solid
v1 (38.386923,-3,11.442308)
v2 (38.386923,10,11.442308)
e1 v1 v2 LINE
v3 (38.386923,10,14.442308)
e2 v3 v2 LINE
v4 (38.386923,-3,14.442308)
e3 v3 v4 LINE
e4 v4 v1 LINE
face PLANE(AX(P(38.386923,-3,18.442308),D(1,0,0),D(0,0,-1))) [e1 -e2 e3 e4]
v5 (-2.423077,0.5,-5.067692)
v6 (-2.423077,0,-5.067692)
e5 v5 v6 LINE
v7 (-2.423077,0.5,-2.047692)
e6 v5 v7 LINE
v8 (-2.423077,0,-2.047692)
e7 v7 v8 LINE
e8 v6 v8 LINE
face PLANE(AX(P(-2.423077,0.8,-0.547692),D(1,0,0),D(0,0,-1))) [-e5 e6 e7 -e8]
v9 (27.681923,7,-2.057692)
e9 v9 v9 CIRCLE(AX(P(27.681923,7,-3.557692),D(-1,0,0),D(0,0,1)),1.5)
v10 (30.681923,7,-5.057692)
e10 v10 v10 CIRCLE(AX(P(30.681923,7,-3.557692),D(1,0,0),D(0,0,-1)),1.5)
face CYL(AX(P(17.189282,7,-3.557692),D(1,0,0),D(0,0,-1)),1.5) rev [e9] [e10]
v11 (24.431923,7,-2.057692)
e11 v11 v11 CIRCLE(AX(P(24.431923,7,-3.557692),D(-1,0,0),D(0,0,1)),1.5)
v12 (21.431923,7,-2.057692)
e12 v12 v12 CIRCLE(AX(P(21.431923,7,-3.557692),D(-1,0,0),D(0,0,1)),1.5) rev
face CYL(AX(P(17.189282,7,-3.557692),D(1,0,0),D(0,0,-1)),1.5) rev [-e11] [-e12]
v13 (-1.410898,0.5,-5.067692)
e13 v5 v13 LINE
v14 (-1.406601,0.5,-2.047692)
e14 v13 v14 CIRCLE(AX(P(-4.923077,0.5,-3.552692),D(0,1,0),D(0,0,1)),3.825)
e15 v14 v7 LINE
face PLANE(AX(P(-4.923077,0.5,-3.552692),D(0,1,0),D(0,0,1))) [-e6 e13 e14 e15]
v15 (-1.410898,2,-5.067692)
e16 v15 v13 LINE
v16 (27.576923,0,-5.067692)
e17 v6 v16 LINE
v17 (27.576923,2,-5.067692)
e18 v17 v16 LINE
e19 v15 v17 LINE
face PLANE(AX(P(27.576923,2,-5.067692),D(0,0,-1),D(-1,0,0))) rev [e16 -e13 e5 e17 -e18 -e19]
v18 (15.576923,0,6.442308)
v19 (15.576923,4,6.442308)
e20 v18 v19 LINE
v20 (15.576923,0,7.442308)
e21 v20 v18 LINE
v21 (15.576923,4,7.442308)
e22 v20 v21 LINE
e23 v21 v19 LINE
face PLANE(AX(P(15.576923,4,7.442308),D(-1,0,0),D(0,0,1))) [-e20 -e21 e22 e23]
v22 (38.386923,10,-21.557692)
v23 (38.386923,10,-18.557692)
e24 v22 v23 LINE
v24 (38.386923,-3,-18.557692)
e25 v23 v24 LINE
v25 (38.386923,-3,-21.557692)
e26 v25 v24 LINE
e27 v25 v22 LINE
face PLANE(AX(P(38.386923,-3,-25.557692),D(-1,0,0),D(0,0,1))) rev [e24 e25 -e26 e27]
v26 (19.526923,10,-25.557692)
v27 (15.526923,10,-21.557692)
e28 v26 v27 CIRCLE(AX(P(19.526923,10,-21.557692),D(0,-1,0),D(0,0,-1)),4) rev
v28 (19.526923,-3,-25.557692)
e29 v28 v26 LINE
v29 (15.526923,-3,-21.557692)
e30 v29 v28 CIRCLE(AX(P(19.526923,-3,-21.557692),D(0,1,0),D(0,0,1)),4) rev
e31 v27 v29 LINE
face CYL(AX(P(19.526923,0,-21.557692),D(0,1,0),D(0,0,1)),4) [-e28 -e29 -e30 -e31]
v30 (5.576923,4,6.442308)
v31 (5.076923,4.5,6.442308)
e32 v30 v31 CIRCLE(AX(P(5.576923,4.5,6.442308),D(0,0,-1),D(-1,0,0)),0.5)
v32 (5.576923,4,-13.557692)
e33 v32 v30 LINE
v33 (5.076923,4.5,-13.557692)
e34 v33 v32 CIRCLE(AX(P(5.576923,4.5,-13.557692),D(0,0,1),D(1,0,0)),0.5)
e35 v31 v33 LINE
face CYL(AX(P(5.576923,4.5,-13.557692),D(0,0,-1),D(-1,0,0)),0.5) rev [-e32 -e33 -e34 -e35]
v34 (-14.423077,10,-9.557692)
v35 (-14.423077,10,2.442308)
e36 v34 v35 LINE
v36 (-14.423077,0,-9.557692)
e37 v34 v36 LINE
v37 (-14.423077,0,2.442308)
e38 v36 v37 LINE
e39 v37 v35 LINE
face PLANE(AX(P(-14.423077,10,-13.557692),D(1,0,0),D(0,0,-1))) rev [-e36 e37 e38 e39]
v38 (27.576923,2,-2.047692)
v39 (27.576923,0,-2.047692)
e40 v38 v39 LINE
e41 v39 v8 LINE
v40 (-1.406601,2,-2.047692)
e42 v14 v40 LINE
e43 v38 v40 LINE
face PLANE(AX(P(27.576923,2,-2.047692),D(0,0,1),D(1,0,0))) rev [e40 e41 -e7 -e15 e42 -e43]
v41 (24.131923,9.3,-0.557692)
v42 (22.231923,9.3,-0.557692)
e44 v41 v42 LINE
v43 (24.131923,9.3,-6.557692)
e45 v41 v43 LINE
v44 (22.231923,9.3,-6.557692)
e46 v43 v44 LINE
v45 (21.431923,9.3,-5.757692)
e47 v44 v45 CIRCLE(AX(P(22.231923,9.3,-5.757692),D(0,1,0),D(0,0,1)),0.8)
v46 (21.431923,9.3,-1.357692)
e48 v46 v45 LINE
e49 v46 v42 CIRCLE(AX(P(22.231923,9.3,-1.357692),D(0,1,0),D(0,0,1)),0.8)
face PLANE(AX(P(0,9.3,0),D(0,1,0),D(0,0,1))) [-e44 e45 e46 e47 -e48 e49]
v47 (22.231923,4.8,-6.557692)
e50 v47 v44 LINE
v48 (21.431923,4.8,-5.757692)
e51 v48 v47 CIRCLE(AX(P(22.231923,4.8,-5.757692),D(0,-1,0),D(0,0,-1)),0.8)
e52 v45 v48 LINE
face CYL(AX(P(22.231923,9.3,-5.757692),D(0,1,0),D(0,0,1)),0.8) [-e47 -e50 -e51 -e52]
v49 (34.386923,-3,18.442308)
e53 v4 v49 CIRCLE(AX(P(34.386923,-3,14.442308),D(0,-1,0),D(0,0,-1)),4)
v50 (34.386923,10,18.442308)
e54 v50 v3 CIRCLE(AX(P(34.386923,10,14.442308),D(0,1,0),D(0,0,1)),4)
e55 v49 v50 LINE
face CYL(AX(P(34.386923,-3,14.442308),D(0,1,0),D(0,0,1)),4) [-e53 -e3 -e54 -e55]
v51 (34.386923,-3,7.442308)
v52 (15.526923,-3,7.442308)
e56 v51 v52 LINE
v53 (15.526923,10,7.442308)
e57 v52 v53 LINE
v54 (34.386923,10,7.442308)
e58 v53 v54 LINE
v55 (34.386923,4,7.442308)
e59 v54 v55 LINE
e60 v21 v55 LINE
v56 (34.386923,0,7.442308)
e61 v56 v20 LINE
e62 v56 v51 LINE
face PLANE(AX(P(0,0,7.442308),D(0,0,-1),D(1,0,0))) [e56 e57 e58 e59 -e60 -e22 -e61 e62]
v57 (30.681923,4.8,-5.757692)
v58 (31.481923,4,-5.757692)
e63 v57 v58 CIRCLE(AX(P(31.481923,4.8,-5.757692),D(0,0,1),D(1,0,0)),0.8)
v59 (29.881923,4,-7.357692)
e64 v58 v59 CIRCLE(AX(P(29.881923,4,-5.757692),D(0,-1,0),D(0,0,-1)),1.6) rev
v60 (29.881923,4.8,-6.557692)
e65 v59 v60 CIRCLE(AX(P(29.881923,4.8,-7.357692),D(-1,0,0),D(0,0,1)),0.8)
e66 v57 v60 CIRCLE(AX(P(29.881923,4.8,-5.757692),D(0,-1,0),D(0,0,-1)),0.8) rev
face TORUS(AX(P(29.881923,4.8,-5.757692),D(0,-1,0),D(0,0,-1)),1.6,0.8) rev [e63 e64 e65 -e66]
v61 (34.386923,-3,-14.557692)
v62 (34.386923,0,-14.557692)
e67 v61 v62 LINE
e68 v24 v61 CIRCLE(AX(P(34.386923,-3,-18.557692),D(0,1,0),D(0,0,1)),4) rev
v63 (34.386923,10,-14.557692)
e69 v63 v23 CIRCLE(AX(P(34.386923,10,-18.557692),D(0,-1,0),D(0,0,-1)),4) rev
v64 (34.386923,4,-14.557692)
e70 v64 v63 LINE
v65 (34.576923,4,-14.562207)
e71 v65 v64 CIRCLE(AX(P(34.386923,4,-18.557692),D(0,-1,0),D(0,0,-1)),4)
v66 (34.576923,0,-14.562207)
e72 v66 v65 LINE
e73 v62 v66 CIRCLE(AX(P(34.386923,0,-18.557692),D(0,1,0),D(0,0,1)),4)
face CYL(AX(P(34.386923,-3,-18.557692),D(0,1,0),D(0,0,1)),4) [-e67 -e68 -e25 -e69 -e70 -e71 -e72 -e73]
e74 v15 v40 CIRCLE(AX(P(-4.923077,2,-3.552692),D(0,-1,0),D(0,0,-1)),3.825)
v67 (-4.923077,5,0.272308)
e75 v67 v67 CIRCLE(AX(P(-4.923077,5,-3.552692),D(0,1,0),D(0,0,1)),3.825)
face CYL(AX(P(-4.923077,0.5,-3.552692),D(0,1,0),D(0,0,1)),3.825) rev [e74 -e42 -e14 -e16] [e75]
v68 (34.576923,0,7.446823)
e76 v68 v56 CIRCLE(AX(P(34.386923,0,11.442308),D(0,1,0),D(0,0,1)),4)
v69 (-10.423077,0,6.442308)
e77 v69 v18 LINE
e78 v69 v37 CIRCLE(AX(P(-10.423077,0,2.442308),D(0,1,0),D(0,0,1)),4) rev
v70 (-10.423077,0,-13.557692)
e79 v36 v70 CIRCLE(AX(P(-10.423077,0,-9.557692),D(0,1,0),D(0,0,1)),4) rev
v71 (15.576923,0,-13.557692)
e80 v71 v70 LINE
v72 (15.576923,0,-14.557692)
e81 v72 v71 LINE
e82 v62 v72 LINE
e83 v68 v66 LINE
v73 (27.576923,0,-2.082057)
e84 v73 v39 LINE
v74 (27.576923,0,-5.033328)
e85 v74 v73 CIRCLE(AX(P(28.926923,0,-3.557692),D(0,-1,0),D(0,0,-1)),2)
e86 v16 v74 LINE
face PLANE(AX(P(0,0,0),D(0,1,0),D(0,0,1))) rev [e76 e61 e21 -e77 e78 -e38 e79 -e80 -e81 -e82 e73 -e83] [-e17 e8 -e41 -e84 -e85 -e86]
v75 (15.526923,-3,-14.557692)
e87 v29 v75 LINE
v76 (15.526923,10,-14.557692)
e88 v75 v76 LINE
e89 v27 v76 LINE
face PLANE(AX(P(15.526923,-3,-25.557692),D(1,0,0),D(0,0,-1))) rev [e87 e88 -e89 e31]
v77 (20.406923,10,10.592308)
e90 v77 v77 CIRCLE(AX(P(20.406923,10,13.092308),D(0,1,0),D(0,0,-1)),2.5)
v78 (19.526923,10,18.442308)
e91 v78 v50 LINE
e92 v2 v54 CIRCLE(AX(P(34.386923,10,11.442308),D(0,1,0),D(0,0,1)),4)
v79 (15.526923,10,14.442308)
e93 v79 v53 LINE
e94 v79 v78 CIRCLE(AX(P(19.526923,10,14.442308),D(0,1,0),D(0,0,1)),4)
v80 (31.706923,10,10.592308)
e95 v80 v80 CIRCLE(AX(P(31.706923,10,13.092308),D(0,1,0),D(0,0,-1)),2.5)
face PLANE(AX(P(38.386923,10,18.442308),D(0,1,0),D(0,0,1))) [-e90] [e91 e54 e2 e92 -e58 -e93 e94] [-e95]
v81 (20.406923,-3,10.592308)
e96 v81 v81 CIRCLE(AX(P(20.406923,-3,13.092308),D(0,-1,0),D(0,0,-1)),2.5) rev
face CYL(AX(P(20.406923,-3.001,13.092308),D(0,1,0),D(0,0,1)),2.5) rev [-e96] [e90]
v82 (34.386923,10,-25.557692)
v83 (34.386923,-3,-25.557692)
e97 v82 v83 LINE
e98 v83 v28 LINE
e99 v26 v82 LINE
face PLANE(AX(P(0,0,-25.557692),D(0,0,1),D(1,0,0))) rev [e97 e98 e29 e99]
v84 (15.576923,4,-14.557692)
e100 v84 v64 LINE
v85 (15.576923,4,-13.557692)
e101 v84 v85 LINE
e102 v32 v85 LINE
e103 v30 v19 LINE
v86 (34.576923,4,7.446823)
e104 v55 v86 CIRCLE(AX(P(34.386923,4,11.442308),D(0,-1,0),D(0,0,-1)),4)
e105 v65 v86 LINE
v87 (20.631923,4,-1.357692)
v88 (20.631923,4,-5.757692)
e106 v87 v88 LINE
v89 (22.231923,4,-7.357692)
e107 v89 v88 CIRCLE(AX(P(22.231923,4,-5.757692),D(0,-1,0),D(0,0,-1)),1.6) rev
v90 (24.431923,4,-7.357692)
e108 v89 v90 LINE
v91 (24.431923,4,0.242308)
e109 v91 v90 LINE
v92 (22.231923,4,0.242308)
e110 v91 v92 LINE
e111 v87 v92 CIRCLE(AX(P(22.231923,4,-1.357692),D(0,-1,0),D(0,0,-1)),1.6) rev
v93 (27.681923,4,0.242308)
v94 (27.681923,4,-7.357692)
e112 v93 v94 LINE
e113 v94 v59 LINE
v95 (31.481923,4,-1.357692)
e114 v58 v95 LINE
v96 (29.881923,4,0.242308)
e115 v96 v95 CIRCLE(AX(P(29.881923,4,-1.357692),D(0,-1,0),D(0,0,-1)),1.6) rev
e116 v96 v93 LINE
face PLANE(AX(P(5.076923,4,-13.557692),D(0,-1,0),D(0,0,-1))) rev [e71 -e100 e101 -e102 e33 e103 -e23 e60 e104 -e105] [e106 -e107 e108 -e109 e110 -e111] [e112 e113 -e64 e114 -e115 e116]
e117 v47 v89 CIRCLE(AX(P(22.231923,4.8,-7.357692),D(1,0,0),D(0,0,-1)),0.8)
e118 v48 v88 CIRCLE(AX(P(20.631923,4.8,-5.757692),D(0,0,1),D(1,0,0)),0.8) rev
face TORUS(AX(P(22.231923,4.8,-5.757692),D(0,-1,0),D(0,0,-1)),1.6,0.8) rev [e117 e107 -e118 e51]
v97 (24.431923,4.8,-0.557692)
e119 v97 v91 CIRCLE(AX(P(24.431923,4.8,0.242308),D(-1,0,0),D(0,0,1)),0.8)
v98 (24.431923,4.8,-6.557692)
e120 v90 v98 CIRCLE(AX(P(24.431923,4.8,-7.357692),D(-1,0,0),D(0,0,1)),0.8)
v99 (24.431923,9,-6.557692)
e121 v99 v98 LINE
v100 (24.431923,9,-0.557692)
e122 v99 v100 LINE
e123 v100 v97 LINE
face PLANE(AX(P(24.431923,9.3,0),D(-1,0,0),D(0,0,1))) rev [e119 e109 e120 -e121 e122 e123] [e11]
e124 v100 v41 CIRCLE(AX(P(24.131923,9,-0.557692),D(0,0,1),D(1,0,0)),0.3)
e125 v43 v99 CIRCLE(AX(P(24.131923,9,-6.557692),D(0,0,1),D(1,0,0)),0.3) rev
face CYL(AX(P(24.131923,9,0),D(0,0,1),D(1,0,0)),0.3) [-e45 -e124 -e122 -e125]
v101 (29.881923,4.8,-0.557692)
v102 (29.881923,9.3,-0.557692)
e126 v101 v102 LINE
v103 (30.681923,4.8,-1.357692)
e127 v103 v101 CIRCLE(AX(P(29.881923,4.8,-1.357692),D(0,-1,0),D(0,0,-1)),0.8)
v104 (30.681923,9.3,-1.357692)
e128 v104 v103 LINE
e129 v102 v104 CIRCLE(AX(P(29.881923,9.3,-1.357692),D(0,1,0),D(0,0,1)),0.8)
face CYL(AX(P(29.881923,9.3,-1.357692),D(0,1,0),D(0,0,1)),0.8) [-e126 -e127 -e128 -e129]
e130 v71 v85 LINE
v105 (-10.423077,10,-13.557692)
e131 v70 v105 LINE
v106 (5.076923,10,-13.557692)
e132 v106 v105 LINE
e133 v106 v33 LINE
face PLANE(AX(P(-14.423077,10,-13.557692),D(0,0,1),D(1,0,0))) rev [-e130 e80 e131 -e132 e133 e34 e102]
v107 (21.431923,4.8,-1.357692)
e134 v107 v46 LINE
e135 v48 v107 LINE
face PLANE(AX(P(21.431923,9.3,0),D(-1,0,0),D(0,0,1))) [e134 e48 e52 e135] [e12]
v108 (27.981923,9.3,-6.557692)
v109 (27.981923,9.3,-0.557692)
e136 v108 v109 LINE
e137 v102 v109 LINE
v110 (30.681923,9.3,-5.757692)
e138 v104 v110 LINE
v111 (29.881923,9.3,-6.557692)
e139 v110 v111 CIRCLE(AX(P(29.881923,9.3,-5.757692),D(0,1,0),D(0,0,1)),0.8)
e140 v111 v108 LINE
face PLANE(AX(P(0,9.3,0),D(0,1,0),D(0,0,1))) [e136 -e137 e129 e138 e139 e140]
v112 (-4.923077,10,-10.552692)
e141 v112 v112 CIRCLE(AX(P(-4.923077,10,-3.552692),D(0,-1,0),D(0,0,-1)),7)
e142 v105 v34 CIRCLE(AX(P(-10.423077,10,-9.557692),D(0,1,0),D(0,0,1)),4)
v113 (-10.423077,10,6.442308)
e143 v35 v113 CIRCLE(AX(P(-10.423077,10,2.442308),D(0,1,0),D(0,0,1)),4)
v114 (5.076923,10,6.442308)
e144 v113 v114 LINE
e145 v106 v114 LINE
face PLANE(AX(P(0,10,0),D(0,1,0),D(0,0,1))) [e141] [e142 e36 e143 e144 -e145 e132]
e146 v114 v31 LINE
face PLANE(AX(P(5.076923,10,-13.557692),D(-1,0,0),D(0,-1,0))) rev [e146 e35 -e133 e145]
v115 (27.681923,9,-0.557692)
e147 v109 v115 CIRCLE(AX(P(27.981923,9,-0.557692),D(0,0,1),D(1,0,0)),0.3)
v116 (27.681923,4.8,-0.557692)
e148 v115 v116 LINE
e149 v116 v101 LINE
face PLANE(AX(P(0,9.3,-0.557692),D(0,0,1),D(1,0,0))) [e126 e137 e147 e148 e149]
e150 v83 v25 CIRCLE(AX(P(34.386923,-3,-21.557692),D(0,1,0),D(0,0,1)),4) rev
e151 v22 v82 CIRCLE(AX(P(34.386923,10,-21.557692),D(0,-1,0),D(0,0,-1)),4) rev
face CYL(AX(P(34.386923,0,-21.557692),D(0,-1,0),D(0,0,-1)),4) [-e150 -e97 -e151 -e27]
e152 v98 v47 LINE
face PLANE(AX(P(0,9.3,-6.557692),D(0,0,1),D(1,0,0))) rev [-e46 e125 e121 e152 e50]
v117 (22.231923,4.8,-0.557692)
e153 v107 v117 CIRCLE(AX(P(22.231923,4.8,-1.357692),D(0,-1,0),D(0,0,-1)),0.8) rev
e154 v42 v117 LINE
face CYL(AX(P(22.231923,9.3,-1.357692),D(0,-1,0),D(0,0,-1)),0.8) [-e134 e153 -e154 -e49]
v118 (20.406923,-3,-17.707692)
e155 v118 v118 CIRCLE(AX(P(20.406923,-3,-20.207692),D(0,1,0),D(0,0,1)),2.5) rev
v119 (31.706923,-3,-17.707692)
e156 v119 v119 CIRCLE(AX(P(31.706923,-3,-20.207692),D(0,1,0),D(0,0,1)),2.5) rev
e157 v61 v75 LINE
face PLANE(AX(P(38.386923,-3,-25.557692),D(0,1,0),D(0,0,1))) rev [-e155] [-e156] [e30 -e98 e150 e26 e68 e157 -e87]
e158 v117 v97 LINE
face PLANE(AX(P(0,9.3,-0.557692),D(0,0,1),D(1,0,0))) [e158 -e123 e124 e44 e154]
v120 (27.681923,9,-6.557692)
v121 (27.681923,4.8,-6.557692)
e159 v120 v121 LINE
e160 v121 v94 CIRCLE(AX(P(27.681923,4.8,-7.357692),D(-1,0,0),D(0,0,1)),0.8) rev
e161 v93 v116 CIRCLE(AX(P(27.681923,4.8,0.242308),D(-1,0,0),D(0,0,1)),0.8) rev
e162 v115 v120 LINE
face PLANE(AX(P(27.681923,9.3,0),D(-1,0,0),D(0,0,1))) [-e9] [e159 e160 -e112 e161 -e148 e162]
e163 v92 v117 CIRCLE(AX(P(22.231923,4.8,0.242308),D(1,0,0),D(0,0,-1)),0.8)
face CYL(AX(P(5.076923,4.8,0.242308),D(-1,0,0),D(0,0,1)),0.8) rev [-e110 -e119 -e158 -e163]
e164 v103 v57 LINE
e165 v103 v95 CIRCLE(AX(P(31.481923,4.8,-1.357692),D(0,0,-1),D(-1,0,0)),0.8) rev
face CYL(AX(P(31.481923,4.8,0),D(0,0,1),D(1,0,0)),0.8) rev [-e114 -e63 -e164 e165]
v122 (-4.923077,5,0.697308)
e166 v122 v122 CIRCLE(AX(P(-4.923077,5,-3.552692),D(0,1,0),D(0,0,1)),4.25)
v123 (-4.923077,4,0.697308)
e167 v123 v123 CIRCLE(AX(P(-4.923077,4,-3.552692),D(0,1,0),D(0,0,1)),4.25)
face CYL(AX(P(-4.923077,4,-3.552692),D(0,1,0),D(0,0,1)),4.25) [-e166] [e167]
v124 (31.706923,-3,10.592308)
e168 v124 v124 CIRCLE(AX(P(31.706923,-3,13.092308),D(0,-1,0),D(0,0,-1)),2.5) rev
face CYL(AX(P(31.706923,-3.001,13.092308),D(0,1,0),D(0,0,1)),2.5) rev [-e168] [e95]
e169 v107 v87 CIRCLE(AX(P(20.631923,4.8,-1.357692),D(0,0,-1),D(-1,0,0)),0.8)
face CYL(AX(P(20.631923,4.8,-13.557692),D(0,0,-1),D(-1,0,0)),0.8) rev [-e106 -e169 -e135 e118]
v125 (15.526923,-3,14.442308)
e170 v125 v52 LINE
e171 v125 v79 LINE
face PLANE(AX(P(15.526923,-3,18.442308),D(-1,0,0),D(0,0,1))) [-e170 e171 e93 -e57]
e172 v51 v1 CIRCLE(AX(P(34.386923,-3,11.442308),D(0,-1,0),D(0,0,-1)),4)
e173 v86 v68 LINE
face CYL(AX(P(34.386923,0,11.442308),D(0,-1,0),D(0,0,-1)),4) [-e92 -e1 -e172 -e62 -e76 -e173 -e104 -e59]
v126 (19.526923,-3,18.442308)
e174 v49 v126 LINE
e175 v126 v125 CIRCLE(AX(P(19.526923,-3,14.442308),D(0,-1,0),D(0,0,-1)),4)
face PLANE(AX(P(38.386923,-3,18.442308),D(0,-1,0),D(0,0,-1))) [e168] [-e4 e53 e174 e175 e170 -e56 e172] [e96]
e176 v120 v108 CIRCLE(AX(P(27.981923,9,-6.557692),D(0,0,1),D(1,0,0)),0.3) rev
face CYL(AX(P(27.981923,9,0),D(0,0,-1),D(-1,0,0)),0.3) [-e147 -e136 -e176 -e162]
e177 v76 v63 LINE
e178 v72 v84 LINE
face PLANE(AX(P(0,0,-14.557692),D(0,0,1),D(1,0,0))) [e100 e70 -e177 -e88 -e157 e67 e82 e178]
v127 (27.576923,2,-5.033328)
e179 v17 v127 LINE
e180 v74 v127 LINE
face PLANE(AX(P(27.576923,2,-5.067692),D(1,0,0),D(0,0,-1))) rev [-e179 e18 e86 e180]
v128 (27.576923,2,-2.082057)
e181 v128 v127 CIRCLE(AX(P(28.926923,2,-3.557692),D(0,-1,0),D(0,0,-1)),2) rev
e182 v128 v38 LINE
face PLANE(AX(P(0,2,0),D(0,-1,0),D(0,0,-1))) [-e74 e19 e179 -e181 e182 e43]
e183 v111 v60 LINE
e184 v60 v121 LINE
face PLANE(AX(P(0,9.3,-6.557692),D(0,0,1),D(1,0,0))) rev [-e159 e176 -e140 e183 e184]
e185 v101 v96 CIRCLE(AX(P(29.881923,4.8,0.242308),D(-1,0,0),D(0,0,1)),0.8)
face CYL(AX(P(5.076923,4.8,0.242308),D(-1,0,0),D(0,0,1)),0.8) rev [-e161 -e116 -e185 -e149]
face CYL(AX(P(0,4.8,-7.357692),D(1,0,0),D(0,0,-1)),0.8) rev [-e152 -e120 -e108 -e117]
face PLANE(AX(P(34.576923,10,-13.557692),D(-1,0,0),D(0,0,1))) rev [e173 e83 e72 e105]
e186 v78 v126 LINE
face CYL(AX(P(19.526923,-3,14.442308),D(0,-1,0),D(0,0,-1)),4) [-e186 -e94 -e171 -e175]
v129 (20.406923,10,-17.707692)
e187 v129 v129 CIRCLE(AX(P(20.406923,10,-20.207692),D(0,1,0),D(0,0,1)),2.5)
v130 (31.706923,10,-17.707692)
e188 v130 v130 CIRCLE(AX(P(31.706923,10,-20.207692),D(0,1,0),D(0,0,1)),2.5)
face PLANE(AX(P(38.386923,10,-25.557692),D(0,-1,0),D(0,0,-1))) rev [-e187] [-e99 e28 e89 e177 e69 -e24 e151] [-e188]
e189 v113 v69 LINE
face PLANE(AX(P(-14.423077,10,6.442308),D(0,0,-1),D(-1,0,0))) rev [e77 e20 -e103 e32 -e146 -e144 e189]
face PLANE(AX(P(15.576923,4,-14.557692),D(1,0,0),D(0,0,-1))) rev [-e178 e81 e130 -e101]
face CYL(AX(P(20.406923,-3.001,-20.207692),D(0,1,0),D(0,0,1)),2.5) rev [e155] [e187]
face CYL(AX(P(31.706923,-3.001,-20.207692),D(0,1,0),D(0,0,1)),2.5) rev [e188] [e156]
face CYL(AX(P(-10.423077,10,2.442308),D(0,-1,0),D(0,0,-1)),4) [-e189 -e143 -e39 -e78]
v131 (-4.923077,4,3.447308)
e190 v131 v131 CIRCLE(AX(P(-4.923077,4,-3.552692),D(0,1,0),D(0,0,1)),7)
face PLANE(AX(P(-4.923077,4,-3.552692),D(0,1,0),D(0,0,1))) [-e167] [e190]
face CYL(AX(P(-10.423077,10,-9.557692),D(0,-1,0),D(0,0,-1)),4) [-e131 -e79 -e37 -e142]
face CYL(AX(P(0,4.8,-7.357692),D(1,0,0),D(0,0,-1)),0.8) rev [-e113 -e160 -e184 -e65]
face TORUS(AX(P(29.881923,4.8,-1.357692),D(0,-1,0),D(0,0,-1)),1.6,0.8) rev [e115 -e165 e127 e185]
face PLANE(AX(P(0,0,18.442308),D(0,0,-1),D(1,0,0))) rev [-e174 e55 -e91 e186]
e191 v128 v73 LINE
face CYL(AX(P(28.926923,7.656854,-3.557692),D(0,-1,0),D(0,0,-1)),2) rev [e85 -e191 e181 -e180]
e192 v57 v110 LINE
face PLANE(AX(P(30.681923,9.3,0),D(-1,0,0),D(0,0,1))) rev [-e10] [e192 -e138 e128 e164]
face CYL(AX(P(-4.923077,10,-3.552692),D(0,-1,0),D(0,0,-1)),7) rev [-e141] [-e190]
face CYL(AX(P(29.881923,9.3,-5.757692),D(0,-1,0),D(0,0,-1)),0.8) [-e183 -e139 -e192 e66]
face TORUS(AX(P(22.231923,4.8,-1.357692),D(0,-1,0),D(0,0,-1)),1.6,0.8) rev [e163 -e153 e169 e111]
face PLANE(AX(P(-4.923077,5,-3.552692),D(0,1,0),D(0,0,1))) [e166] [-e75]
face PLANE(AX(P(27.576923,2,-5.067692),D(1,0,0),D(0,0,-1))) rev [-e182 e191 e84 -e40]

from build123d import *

# Parameters (mm, degrees)
SKETCH2_W            = 49
SKETCH2_H            = 20
BOSS_EXTRUDE1_DEPTH  = 10
SKETCH3_W            = 30
SKETCH3_H            = 3.02
CUT_EXTRUDE1_DEPTH   = 2
SKETCH4_W            = 5
SKETCH4_H            = 6
CUT_EXTRUDE2_DEPTH   = 5
SKETCH5_R            = 7
CUT_EXTRUDE3_DEPTH   = 38.474986727
SKETCH12_W           = 5
SKETCH12_H           = 6
BOSS_EXTRUDE4_DEPTH  = 0.8
SKETCH14_W           = 29.5
SKETCH14_H           = 6
CUT_EXTRUDE6_DEPTH   = 42.177221974
SKETCH20_W           = 5
SKETCH20_H           = 6
BOSS_EXTRUDE6_DEPTH  = 4.2
SKETCH21_R           = 4.6
CUT_EXTRUDE8_DEPTH   = 0.5
SKETCH22_R           = 3.825
CUT_EXTRUDE9_DEPTH   = 4
SKETCH24_R           = 4.6
SKETCH24_R_2         = 4.25
CUT_EXTRUDE11_DEPTH  = 1
BOSS_EXTRUDE9_START  = 0.5
SKETCH26_R           = 4.25
SKETCH26_R_2         = 3.825
BOSS_EXTRUDE9_DEPTH  = 0.5
SKETCH27_R           = 7
SKETCH27_R_2         = 4.6
CUT_EXTRUDE12_DEPTH  = 1
FILLET1_R            = 0.5
SKETCH56_R           = 2
CUT_EXTRUDE13_DEPTH  = 2
SKETCH57_W           = 3
SKETCH57_H           = 6
BOSS_EXTRUDE19_DEPTH = 5.3
CUT_EXTRUDE14_REACH  = 50.148
SKETCH58_R           = 1.5
FILLET2_R            = 0.3
FILLET3_R            = 0.8
SKETCH60_W           = 19
SKETCH60_H           = 4
BOSS_EXTRUDE21_DEPTH = 1
SKETCH59_W           = 22.86
SKETCH59_H           = 13
BOSS_EXTRUDE20_DEPTH = 11
CUT_EXTRUDE15_REACH  = 49.914
SKETCH61_R           = 2.5
FILLET4_R            = 4


with BuildPart() as part:
    # Sketch2 → Boss-Extrude1 (new body)
    with BuildSketch(Plane(origin=(0, 0, 0), x_dir=(1, 0, 0), z_dir=(0, 1, 0))):
        with Locations((10.076923077, 3.557692308)):
            Rectangle(SKETCH2_W, SKETCH2_H)
    extrude(amount=BOSS_EXTRUDE1_DEPTH)

    # Sketch3 → Cut-Extrude1 (cut)
    with BuildSketch(Plane.XZ):
        with Locations((12.576923077, -3.557692308)):
            Rectangle(SKETCH3_W, SKETCH3_H)
    extrude(amount=-CUT_EXTRUDE1_DEPTH, mode=Mode.SUBTRACT)

    # Sketch4 → Cut-Extrude2 (cut)
    with BuildSketch(Plane.XZ):
        with Locations((-4.923076923, -3.547692308)):
            Rectangle(SKETCH4_W, SKETCH4_H)
    extrude(amount=-CUT_EXTRUDE2_DEPTH, mode=Mode.SUBTRACT)

    # Sketch5 → Cut-Extrude3 (cut, through all)
    with BuildSketch(Plane.XZ.offset(-5)):
        with Locations(Location((-4.923076923, -3.552692308, 0), (0, 0, 270))):
            Circle(SKETCH5_R)
    extrude(amount=-CUT_EXTRUDE3_DEPTH, mode=Mode.SUBTRACT)

    # Sketch12 → Boss-Extrude4 (add)
    with BuildSketch(Plane.XZ):
        with Locations((-4.923076923, -3.547692308)):
            Rectangle(SKETCH12_W, SKETCH12_H)
    extrude(amount=-BOSS_EXTRUDE4_DEPTH)

    # Sketch14 → Cut-Extrude6 (cut, through all)
    with BuildSketch(Plane.XY.offset(6.442307692)):
        with Locations((19.826923077, 7)):
            Rectangle(SKETCH14_W, SKETCH14_H)
    extrude(amount=-CUT_EXTRUDE6_DEPTH, mode=Mode.SUBTRACT)

    # Sketch20 → Boss-Extrude6 (add)
    with BuildSketch(Plane(origin=(0, 0.8, 0), x_dir=(1, 0, 0), z_dir=(0, 1, 0))):
        with Locations((-4.923076923, 3.547692308)):
            Rectangle(SKETCH20_W, SKETCH20_H)
    extrude(amount=BOSS_EXTRUDE6_DEPTH)

    # Sketch21 → Cut-Extrude8 (cut)
    with BuildSketch(Plane(origin=(0, 5, 0), x_dir=(1, 0, 0), z_dir=(0, 1, 0))):
        with Locations(Location((-4.923076923, 3.552692308, 0), (0, 0, 270))):
            Circle(SKETCH21_R)
    extrude(amount=-CUT_EXTRUDE8_DEPTH, mode=Mode.SUBTRACT)

    # Sketch22 → Cut-Extrude9 (cut)
    with BuildSketch(Plane(origin=(0, 4.5, 0), x_dir=(1, 0, 0), z_dir=(0, 1, 0))):
        with Locations(Location((-4.923076923, 3.552692308, 0), (0, 0, 270))):
            Circle(SKETCH22_R)
    extrude(amount=-CUT_EXTRUDE9_DEPTH, mode=Mode.SUBTRACT)

    # Sketch24 → Cut-Extrude11 (cut)
    with BuildSketch(Plane(origin=(0, 5, 0), x_dir=(1, 0, 0), z_dir=(0, 1, 0))):
        with Locations(Location((-4.923076923, 3.552692308, 0), (0, 0, 270))):
            Circle(SKETCH24_R)
        with Locations(Location((-4.923076923, 3.552692308, 0), (0, 0, 270))):
            Circle(SKETCH24_R_2, mode=Mode.SUBTRACT)
    extrude(amount=-CUT_EXTRUDE11_DEPTH, mode=Mode.SUBTRACT)

    # Sketch26 → Boss-Extrude9 (add)
    with BuildSketch(Plane(origin=(0, 4.5, 0), x_dir=(1, 0, 0), z_dir=(0, 1, 0)).offset(BOSS_EXTRUDE9_START)):
        with Locations(Location((-4.923076923, 3.552692308, 0), (0, 0, 270))):
            Circle(SKETCH26_R)
        with Locations(Location((-4.923076923, 3.552692308, 0), (0, 0, 270))):
            Circle(SKETCH26_R_2, mode=Mode.SUBTRACT)
    extrude(amount=-BOSS_EXTRUDE9_DEPTH)

    # Sketch27 → Cut-Extrude12 (cut)
    with BuildSketch(Plane(origin=(0, 5, 0), x_dir=(1, 0, 0), z_dir=(0, 1, 0))):
        with Locations(Location((-4.923076923, 3.552692308, 0), (0, 0, 90))):
            Circle(SKETCH27_R)
        with Locations((-4.923076923, 3.552692308)):
            Circle(SKETCH27_R_2, mode=Mode.SUBTRACT)
    extrude(amount=-CUT_EXTRUDE12_DEPTH, mode=Mode.SUBTRACT)

    # Fillet1
    fillet1_edges = [part.edges().sort_by_distance(p)[0] for p in [
        (5.076923077, 4, -3.557692308),
    ]]
    fillet(fillet1_edges, radius=FILLET1_R)

    # Sketch56 → Cut-Extrude13 (cut)
    with BuildSketch(Plane.XZ):
        with Locations((28.926923077, -3.557692308)):
            Circle(SKETCH56_R)
    extrude(amount=-CUT_EXTRUDE13_DEPTH, mode=Mode.SUBTRACT)

    # Sketch57 → Boss-Extrude19 (add)
    with BuildSketch(Plane(origin=(0, 4, 0), x_dir=(1, 0, 0), z_dir=(0, 1, 0))):
        with Locations((29.181923077, 3.557692308)):
            Rectangle(SKETCH57_W, SKETCH57_H)
        with Locations((22.931923077, 3.557692308)):
            Rectangle(SKETCH57_W, SKETCH57_H)
    extrude(amount=BOSS_EXTRUDE19_DEPTH)

    # Cut-Extrude14: up to this face of the body (flat: up to its plane)
    cut_extrude14_end = Plane(part.part.faces().sort_by_distance((21.431923077, 6.65, -3.557692308))[0])
    # Sketch58 → Cut-Extrude14 (cut, up to the picked face)
    with BuildSketch(Plane(origin=(30.681923077, 0, 0), x_dir=(0, 0, -1), z_dir=(1, 0, 0)), mode=Mode.PRIVATE) as cut_extrude14_sk1:
        with Locations(Location((3.557692308, 7, 0), (0, 0, 180))):
            Circle(SKETCH58_R)
    cut_extrude14_tool1 = split(extrude(cut_extrude14_sk1.sketch, amount=-CUT_EXTRUDE14_REACH, mode=Mode.PRIVATE), bisect_by=cut_extrude14_end, keep=Keep.BOTH, mode=Mode.PRIVATE)
    add(cut_extrude14_tool1.solids().sort_by(Axis((30.681923, 7, -3.557692), (-1, 0, 0)))[0], mode=Mode.SUBTRACT)

    # Fillet2
    fillet2_edges = [part.edges().sort_by_distance(p)[0] for p in [
        (27.681923077, 9.3, -3.557692308),
        (24.431923077, 9.3, -3.557692308),
    ]]
    fillet(fillet2_edges, radius=FILLET2_R)

    # Fillet3
    fillet3_edges = [part.edges().sort_by_distance(p)[0] for p in [
        (30.681923077, 4, -3.557692308),
        (30.681923077, 6.65, -0.557692308),
        (29.181923077, 4, -6.557692308),
        (30.681923077, 6.65, -6.557692308),
        (29.181923077, 4, -0.557692308),
        (21.431923077, 6.65, -6.557692308),
        (21.431923077, 6.65, -0.557692308),
        (22.931923077, 4, -6.557692308),
        (21.431923077, 4, -3.557692308),
        (22.931923077, 4, -0.557692308),
    ]]
    fillet(fillet3_edges, radius=FILLET3_R)

    # Sketch60 → Boss-Extrude21 (add)
    with BuildSketch(Plane(origin=(0, 0, -13.557692308), x_dir=(-1, 0, 0), z_dir=(0, 0, -1))):
        with Locations((-25.076923077, 2)):
            Rectangle(SKETCH60_W, SKETCH60_H)
    boss_extrude21 = extrude(amount=BOSS_EXTRUDE21_DEPTH)

    # Sketch59 → Boss-Extrude20 (add)
    with BuildSketch(Plane(origin=(0, 0, -14.557692308), x_dir=(-1, 0, 0), z_dir=(0, 0, -1))):
        with Locations((-26.956923077, 3.5)):
            Rectangle(SKETCH59_W, SKETCH59_H)
    boss_extrude20 = extrude(amount=BOSS_EXTRUDE20_DEPTH)

    # Mirror4: Boss-Extrude21, Boss-Extrude20 across plane
    add(boss_extrude21.mirror(Plane(origin=(0, 0, -3.557692308), x_dir=(1, 0, 0), z_dir=(0, 0, -1))))
    add(boss_extrude20.mirror(Plane(origin=(0, 0, -3.557692308), x_dir=(1, 0, 0), z_dir=(0, 0, -1))))

    # Sketch61 → Cut-Extrude15 (cut, up to next)
    with BuildSketch(Plane(origin=(0, 10, 0), x_dir=(1, 0, 0), z_dir=(0, 1, 0)), mode=Mode.PRIVATE) as cut_extrude15_sk1:
        with Locations(Location((20.406923077, 20.207692308, 0), (0, 0, 270))):
            Circle(SKETCH61_R)
    cut_extrude15_tool1 = extrude(cut_extrude15_sk1.sketch, amount=-CUT_EXTRUDE15_REACH, mode=Mode.PRIVATE) & part.part
    # Sketch61 → Cut-Extrude15 (cut, up to next)
    with BuildSketch(Plane(origin=(0, 10, 0), x_dir=(1, 0, 0), z_dir=(0, 1, 0)), mode=Mode.PRIVATE) as cut_extrude15_sk2:
        with Locations(Location((31.706923077, 20.207692308, 0), (0, 0, 270))):
            Circle(SKETCH61_R)
    cut_extrude15_tool2 = extrude(cut_extrude15_sk2.sketch, amount=-CUT_EXTRUDE15_REACH, mode=Mode.PRIVATE) & part.part
    # Sketch61 → Cut-Extrude15 (cut, up to next)
    with BuildSketch(Plane(origin=(0, 10, 0), x_dir=(1, 0, 0), z_dir=(0, 1, 0)), mode=Mode.PRIVATE) as cut_extrude15_sk3:
        with Locations(Location((31.706923077, -13.092307692, 0), (0, 0, 90))):
            Circle(SKETCH61_R)
    cut_extrude15_tool3 = extrude(cut_extrude15_sk3.sketch, amount=-CUT_EXTRUDE15_REACH, mode=Mode.PRIVATE) & part.part
    # Sketch61 → Cut-Extrude15 (cut, up to next)
    with BuildSketch(Plane(origin=(0, 10, 0), x_dir=(1, 0, 0), z_dir=(0, 1, 0)), mode=Mode.PRIVATE) as cut_extrude15_sk4:
        with Locations(Location((20.406923077, -13.092307692, 0), (0, 0, 90))):
            Circle(SKETCH61_R)
    cut_extrude15_tool4 = extrude(cut_extrude15_sk4.sketch, amount=-CUT_EXTRUDE15_REACH, mode=Mode.PRIVATE) & part.part
    add(cut_extrude15_tool1.solids().sort_by_distance((20.406923, 10, -20.207692))[0], mode=Mode.SUBTRACT)
    add(cut_extrude15_tool2.solids().sort_by_distance((31.706923, 10, -20.207692))[0], mode=Mode.SUBTRACT)
    add(cut_extrude15_tool3.solids().sort_by_distance((31.706923, 10, 13.092308))[0], mode=Mode.SUBTRACT)
    add(cut_extrude15_tool4.solids().sort_by_distance((20.406923, 10, 13.092308))[0], mode=Mode.SUBTRACT)

    # Fillet4
    # the kernel refuses this fillet: 4 mm, written as the material it takes off along each edge
    with BuildSketch(Plane(origin=(38.386923077, 20, -25.557692308), x_dir=(0, 0, 1), z_dir=(0, -1, 0)), Plane(origin=(15.526923077, -13, 18.442307692), x_dir=(1, 0, 0), z_dir=(0, 1, 0)), Plane(origin=(15.526923077, -13, -25.557692308), x_dir=(0, 0, 1), z_dir=(0, 1, 0))) as fillet4_piece_1:
        with BuildLine():
            CenterArc((FILLET4_R, FILLET4_R), FILLET4_R, 180, 90)
            Line((0, FILLET4_R), (0, 0))
            Line((0, 0), (FILLET4_R, 0))
        make_face()
    extrude(amount=33, mode=Mode.SUBTRACT)
    with BuildSketch(Plane(origin=(38.386923077, 20, 7.442307692), x_dir=(0, 0, 1), z_dir=(0, -1, 0))) as fillet4_piece_2_section:
        with BuildLine():
            CenterArc((FILLET4_R, FILLET4_R), FILLET4_R, 180, 90)
            Line((0, FILLET4_R), (0, 0))
            Line((0, 0), (FILLET4_R, 0))
        make_face()
    fillet4_piece_2 = extrude(amount=33, mode=Mode.PRIVATE)
    fillet4_piece_2 = split(fillet4_piece_2, bisect_by=Plane(origin=(34.576923077, 12, 8.351487897), z_dir=(1, 0, 0)), keep=Keep.TOP, mode=Mode.PRIVATE)
    fillet4_piece_2 = split(fillet4_piece_2, bisect_by=Plane(origin=(37.49276705, 4, 8.351487897), z_dir=(0, 1, 0)), keep=Keep.TOP, mode=Mode.PRIVATE)
    add(fillet4_piece_2, mode=Mode.SUBTRACT)
    with BuildSketch(Plane(origin=(38.386923077, 20, 7.442307692), x_dir=(0, 0, 1), z_dir=(0, -1, 0))) as fillet4_piece_3_section:
        with BuildLine():
            CenterArc((FILLET4_R, FILLET4_R), FILLET4_R, 180, 90)
            Line((0, FILLET4_R), (0, 0))
            Line((0, 0), (FILLET4_R, 0))
        make_face()
    fillet4_piece_3 = extrude(amount=33, mode=Mode.PRIVATE)
    fillet4_piece_3 = split(fillet4_piece_3, bisect_by=Plane(origin=(34.576923077, 12, 7.403071145), z_dir=(-1, 0, 0)), keep=Keep.TOP, mode=Mode.PRIVATE)
    fillet4_piece_3 = split(fillet4_piece_3, bisect_by=Plane(origin=(34.482800084, 4, 7.403071145), z_dir=(0, 1, 0)), keep=Keep.TOP, mode=Mode.PRIVATE)
    add(fillet4_piece_3, mode=Mode.SUBTRACT)
    with BuildSketch(Plane(origin=(38.386923077, 20, 7.442307692), x_dir=(0, 0, 1), z_dir=(0, -1, 0))) as fillet4_piece_4_section:
        with BuildLine():
            CenterArc((FILLET4_R, FILLET4_R), FILLET4_R, 180, 90)
            Line((0, FILLET4_R), (0, 0))
            Line((0, 0), (FILLET4_R, 0))
        make_face()
    fillet4_piece_4 = extrude(amount=33, mode=Mode.PRIVATE)
    fillet4_piece_4 = split(fillet4_piece_4, bisect_by=Plane(origin=(34.576923077, 2, 8.351487897), z_dir=(1, 0, 0)), keep=Keep.TOP, mode=Mode.PRIVATE)
    fillet4_piece_4 = split(fillet4_piece_4, bisect_by=Plane(origin=(37.49276705, 0, 8.351487897), z_dir=(0, 1, 0)), keep=Keep.TOP, mode=Mode.PRIVATE)
    fillet4_piece_4 = split(fillet4_piece_4, bisect_by=Plane(origin=(37.49276705, 4, 8.351487897), z_dir=(0, -1, 0)), keep=Keep.TOP, mode=Mode.PRIVATE)
    add(fillet4_piece_4, mode=Mode.SUBTRACT)
    with BuildSketch(Plane(origin=(38.386923077, 20, 7.442307692), x_dir=(0, 0, 1), z_dir=(0, -1, 0))) as fillet4_piece_5_section:
        with BuildLine():
            CenterArc((FILLET4_R, FILLET4_R), FILLET4_R, 180, 90)
            Line((0, FILLET4_R), (0, 0))
            Line((0, 0), (FILLET4_R, 0))
        make_face()
    fillet4_piece_5 = extrude(amount=33, mode=Mode.PRIVATE)
    fillet4_piece_5 = split(fillet4_piece_5, bisect_by=Plane(origin=(34.576923077, -6.5, 8.351487897), z_dir=(1, 0, 0)), keep=Keep.TOP, mode=Mode.PRIVATE)
    fillet4_piece_5 = split(fillet4_piece_5, bisect_by=Plane(origin=(37.49276705, 0, 8.351487897), z_dir=(0, -1, 0)), keep=Keep.TOP, mode=Mode.PRIVATE)
    add(fillet4_piece_5, mode=Mode.SUBTRACT)
    with BuildSketch(Plane(origin=(38.386923077, 20, 7.442307692), x_dir=(0, 0, 1), z_dir=(0, -1, 0))) as fillet4_piece_6_section:
        with BuildLine():
            CenterArc((FILLET4_R, FILLET4_R), FILLET4_R, 180, 90)
            Line((0, FILLET4_R), (0, 0))
            Line((0, 0), (FILLET4_R, 0))
        make_face()
    fillet4_piece_6 = extrude(amount=33, mode=Mode.PRIVATE)
    fillet4_piece_6 = split(fillet4_piece_6, bisect_by=Plane(origin=(34.576923077, -6.5, 7.403071145), z_dir=(-1, 0, 0)), keep=Keep.TOP, mode=Mode.PRIVATE)
    fillet4_piece_6 = split(fillet4_piece_6, bisect_by=Plane(origin=(34.482800084, 0, 7.403071145), z_dir=(0, -1, 0)), keep=Keep.TOP, mode=Mode.PRIVATE)
    add(fillet4_piece_6, mode=Mode.SUBTRACT)
    with BuildSketch(Plane(origin=(38.386923077, 20, 18.442307692), x_dir=(0, 0, -1), z_dir=(0, -1, 0))) as fillet4_piece_7:
        with BuildLine():
            CenterArc((FILLET4_R, -FILLET4_R), FILLET4_R, 90, 90)
            Line((0, -FILLET4_R), (0, 0))
            Line((0, 0), (FILLET4_R, 0))
        make_face()
    extrude(amount=33, mode=Mode.SUBTRACT)
    with BuildSketch(Plane(origin=(-14.423076923, -10, -13.557692308), x_dir=(1, 0, 0), z_dir=(0, 1, 0))) as fillet4_piece_8:
        with BuildLine():
            CenterArc((FILLET4_R, -FILLET4_R), FILLET4_R, 90, 90)
            Line((0, -FILLET4_R), (0, 0))
            Line((0, 0), (FILLET4_R, 0))
        make_face()
    extrude(amount=30, mode=Mode.SUBTRACT)
    with BuildSketch(Plane(origin=(-14.423076923, -10, 6.442307692), x_dir=(1, 0, 0), z_dir=(0, 1, 0))) as fillet4_piece_9:
        with BuildLine():
            CenterArc((FILLET4_R, FILLET4_R), FILLET4_R, 180, 90)
            Line((0, FILLET4_R), (0, 0))
            Line((0, 0), (FILLET4_R, 0))
        make_face()
    extrude(amount=30, mode=Mode.SUBTRACT)
    with BuildSketch(Plane(origin=(38.386923077, 20, -14.557692308), x_dir=(-1, 0, 0), z_dir=(0, -1, 0))) as fillet4_piece_10_section:
        with BuildLine():
            CenterArc((FILLET4_R, FILLET4_R), FILLET4_R, 180, 90)
            Line((0, FILLET4_R), (0, 0))
            Line((0, 0), (FILLET4_R, 0))
        make_face()
    fillet4_piece_10 = extrude(amount=33, mode=Mode.PRIVATE)
    fillet4_piece_10 = split(fillet4_piece_10, bisect_by=Plane(origin=(34.576923077, 12, -14.51845576), z_dir=(-1, 0, 0)), keep=Keep.TOP, mode=Mode.PRIVATE)
    fillet4_piece_10 = split(fillet4_piece_10, bisect_by=Plane(origin=(34.482800084, 4, -14.51845576), z_dir=(0, 1, 0)), keep=Keep.TOP, mode=Mode.PRIVATE)
    add(fillet4_piece_10, mode=Mode.SUBTRACT)
    with BuildSketch(Plane(origin=(38.386923077, 20, -14.557692308), x_dir=(-1, 0, 0), z_dir=(0, -1, 0))) as fillet4_piece_11_section:
        with BuildLine():
            CenterArc((FILLET4_R, FILLET4_R), FILLET4_R, 180, 90)
            Line((0, FILLET4_R), (0, 0))
            Line((0, 0), (FILLET4_R, 0))
        make_face()
    fillet4_piece_11 = extrude(amount=33, mode=Mode.PRIVATE)
    fillet4_piece_11 = split(fillet4_piece_11, bisect_by=Plane(origin=(34.576923077, 12, -15.466872512), z_dir=(1, 0, 0)), keep=Keep.TOP, mode=Mode.PRIVATE)
    fillet4_piece_11 = split(fillet4_piece_11, bisect_by=Plane(origin=(37.49276705, 4, -15.466872512), z_dir=(0, 1, 0)), keep=Keep.TOP, mode=Mode.PRIVATE)
    add(fillet4_piece_11, mode=Mode.SUBTRACT)
    with BuildSketch(Plane(origin=(38.386923077, 20, -14.557692308), x_dir=(-1, 0, 0), z_dir=(0, -1, 0))) as fillet4_piece_12_section:
        with BuildLine():
            CenterArc((FILLET4_R, FILLET4_R), FILLET4_R, 180, 90)
            Line((0, FILLET4_R), (0, 0))
            Line((0, 0), (FILLET4_R, 0))
        make_face()
    fillet4_piece_12 = extrude(amount=33, mode=Mode.PRIVATE)
    fillet4_piece_12 = split(fillet4_piece_12, bisect_by=Plane(origin=(34.576923077, 2, -15.466872512), z_dir=(1, 0, 0)), keep=Keep.TOP, mode=Mode.PRIVATE)
    fillet4_piece_12 = split(fillet4_piece_12, bisect_by=Plane(origin=(37.49276705, 0, -15.466872512), z_dir=(0, 1, 0)), keep=Keep.TOP, mode=Mode.PRIVATE)
    fillet4_piece_12 = split(fillet4_piece_12, bisect_by=Plane(origin=(37.49276705, 4, -15.466872512), z_dir=(0, -1, 0)), keep=Keep.TOP, mode=Mode.PRIVATE)
    add(fillet4_piece_12, mode=Mode.SUBTRACT)
    with BuildSketch(Plane(origin=(38.386923077, 20, -14.557692308), x_dir=(-1, 0, 0), z_dir=(0, -1, 0))) as fillet4_piece_13_section:
        with BuildLine():
            CenterArc((FILLET4_R, FILLET4_R), FILLET4_R, 180, 90)
            Line((0, FILLET4_R), (0, 0))
            Line((0, 0), (FILLET4_R, 0))
        make_face()
    fillet4_piece_13 = extrude(amount=33, mode=Mode.PRIVATE)
    fillet4_piece_13 = split(fillet4_piece_13, bisect_by=Plane(origin=(34.576923077, -6.5, -14.51845576), z_dir=(-1, 0, 0)), keep=Keep.TOP, mode=Mode.PRIVATE)
    fillet4_piece_13 = split(fillet4_piece_13, bisect_by=Plane(origin=(34.482800084, 0, -14.51845576), z_dir=(0, -1, 0)), keep=Keep.TOP, mode=Mode.PRIVATE)
    add(fillet4_piece_13, mode=Mode.SUBTRACT)
    with BuildSketch(Plane(origin=(38.386923077, 20, -14.557692308), x_dir=(-1, 0, 0), z_dir=(0, -1, 0))) as fillet4_piece_14_section:
        with BuildLine():
            CenterArc((FILLET4_R, FILLET4_R), FILLET4_R, 180, 90)
            Line((0, FILLET4_R), (0, 0))
            Line((0, 0), (FILLET4_R, 0))
        make_face()
    fillet4_piece_14 = extrude(amount=33, mode=Mode.PRIVATE)
    fillet4_piece_14 = split(fillet4_piece_14, bisect_by=Plane(origin=(34.576923077, -6.5, -15.466872512), z_dir=(1, 0, 0)), keep=Keep.TOP, mode=Mode.PRIVATE)
    fillet4_piece_14 = split(fillet4_piece_14, bisect_by=Plane(origin=(37.49276705, 0, -15.466872512), z_dir=(0, -1, 0)), keep=Keep.TOP, mode=Mode.PRIVATE)
    add(fillet4_piece_14, mode=Mode.SUBTRACT)


solid = part.part
